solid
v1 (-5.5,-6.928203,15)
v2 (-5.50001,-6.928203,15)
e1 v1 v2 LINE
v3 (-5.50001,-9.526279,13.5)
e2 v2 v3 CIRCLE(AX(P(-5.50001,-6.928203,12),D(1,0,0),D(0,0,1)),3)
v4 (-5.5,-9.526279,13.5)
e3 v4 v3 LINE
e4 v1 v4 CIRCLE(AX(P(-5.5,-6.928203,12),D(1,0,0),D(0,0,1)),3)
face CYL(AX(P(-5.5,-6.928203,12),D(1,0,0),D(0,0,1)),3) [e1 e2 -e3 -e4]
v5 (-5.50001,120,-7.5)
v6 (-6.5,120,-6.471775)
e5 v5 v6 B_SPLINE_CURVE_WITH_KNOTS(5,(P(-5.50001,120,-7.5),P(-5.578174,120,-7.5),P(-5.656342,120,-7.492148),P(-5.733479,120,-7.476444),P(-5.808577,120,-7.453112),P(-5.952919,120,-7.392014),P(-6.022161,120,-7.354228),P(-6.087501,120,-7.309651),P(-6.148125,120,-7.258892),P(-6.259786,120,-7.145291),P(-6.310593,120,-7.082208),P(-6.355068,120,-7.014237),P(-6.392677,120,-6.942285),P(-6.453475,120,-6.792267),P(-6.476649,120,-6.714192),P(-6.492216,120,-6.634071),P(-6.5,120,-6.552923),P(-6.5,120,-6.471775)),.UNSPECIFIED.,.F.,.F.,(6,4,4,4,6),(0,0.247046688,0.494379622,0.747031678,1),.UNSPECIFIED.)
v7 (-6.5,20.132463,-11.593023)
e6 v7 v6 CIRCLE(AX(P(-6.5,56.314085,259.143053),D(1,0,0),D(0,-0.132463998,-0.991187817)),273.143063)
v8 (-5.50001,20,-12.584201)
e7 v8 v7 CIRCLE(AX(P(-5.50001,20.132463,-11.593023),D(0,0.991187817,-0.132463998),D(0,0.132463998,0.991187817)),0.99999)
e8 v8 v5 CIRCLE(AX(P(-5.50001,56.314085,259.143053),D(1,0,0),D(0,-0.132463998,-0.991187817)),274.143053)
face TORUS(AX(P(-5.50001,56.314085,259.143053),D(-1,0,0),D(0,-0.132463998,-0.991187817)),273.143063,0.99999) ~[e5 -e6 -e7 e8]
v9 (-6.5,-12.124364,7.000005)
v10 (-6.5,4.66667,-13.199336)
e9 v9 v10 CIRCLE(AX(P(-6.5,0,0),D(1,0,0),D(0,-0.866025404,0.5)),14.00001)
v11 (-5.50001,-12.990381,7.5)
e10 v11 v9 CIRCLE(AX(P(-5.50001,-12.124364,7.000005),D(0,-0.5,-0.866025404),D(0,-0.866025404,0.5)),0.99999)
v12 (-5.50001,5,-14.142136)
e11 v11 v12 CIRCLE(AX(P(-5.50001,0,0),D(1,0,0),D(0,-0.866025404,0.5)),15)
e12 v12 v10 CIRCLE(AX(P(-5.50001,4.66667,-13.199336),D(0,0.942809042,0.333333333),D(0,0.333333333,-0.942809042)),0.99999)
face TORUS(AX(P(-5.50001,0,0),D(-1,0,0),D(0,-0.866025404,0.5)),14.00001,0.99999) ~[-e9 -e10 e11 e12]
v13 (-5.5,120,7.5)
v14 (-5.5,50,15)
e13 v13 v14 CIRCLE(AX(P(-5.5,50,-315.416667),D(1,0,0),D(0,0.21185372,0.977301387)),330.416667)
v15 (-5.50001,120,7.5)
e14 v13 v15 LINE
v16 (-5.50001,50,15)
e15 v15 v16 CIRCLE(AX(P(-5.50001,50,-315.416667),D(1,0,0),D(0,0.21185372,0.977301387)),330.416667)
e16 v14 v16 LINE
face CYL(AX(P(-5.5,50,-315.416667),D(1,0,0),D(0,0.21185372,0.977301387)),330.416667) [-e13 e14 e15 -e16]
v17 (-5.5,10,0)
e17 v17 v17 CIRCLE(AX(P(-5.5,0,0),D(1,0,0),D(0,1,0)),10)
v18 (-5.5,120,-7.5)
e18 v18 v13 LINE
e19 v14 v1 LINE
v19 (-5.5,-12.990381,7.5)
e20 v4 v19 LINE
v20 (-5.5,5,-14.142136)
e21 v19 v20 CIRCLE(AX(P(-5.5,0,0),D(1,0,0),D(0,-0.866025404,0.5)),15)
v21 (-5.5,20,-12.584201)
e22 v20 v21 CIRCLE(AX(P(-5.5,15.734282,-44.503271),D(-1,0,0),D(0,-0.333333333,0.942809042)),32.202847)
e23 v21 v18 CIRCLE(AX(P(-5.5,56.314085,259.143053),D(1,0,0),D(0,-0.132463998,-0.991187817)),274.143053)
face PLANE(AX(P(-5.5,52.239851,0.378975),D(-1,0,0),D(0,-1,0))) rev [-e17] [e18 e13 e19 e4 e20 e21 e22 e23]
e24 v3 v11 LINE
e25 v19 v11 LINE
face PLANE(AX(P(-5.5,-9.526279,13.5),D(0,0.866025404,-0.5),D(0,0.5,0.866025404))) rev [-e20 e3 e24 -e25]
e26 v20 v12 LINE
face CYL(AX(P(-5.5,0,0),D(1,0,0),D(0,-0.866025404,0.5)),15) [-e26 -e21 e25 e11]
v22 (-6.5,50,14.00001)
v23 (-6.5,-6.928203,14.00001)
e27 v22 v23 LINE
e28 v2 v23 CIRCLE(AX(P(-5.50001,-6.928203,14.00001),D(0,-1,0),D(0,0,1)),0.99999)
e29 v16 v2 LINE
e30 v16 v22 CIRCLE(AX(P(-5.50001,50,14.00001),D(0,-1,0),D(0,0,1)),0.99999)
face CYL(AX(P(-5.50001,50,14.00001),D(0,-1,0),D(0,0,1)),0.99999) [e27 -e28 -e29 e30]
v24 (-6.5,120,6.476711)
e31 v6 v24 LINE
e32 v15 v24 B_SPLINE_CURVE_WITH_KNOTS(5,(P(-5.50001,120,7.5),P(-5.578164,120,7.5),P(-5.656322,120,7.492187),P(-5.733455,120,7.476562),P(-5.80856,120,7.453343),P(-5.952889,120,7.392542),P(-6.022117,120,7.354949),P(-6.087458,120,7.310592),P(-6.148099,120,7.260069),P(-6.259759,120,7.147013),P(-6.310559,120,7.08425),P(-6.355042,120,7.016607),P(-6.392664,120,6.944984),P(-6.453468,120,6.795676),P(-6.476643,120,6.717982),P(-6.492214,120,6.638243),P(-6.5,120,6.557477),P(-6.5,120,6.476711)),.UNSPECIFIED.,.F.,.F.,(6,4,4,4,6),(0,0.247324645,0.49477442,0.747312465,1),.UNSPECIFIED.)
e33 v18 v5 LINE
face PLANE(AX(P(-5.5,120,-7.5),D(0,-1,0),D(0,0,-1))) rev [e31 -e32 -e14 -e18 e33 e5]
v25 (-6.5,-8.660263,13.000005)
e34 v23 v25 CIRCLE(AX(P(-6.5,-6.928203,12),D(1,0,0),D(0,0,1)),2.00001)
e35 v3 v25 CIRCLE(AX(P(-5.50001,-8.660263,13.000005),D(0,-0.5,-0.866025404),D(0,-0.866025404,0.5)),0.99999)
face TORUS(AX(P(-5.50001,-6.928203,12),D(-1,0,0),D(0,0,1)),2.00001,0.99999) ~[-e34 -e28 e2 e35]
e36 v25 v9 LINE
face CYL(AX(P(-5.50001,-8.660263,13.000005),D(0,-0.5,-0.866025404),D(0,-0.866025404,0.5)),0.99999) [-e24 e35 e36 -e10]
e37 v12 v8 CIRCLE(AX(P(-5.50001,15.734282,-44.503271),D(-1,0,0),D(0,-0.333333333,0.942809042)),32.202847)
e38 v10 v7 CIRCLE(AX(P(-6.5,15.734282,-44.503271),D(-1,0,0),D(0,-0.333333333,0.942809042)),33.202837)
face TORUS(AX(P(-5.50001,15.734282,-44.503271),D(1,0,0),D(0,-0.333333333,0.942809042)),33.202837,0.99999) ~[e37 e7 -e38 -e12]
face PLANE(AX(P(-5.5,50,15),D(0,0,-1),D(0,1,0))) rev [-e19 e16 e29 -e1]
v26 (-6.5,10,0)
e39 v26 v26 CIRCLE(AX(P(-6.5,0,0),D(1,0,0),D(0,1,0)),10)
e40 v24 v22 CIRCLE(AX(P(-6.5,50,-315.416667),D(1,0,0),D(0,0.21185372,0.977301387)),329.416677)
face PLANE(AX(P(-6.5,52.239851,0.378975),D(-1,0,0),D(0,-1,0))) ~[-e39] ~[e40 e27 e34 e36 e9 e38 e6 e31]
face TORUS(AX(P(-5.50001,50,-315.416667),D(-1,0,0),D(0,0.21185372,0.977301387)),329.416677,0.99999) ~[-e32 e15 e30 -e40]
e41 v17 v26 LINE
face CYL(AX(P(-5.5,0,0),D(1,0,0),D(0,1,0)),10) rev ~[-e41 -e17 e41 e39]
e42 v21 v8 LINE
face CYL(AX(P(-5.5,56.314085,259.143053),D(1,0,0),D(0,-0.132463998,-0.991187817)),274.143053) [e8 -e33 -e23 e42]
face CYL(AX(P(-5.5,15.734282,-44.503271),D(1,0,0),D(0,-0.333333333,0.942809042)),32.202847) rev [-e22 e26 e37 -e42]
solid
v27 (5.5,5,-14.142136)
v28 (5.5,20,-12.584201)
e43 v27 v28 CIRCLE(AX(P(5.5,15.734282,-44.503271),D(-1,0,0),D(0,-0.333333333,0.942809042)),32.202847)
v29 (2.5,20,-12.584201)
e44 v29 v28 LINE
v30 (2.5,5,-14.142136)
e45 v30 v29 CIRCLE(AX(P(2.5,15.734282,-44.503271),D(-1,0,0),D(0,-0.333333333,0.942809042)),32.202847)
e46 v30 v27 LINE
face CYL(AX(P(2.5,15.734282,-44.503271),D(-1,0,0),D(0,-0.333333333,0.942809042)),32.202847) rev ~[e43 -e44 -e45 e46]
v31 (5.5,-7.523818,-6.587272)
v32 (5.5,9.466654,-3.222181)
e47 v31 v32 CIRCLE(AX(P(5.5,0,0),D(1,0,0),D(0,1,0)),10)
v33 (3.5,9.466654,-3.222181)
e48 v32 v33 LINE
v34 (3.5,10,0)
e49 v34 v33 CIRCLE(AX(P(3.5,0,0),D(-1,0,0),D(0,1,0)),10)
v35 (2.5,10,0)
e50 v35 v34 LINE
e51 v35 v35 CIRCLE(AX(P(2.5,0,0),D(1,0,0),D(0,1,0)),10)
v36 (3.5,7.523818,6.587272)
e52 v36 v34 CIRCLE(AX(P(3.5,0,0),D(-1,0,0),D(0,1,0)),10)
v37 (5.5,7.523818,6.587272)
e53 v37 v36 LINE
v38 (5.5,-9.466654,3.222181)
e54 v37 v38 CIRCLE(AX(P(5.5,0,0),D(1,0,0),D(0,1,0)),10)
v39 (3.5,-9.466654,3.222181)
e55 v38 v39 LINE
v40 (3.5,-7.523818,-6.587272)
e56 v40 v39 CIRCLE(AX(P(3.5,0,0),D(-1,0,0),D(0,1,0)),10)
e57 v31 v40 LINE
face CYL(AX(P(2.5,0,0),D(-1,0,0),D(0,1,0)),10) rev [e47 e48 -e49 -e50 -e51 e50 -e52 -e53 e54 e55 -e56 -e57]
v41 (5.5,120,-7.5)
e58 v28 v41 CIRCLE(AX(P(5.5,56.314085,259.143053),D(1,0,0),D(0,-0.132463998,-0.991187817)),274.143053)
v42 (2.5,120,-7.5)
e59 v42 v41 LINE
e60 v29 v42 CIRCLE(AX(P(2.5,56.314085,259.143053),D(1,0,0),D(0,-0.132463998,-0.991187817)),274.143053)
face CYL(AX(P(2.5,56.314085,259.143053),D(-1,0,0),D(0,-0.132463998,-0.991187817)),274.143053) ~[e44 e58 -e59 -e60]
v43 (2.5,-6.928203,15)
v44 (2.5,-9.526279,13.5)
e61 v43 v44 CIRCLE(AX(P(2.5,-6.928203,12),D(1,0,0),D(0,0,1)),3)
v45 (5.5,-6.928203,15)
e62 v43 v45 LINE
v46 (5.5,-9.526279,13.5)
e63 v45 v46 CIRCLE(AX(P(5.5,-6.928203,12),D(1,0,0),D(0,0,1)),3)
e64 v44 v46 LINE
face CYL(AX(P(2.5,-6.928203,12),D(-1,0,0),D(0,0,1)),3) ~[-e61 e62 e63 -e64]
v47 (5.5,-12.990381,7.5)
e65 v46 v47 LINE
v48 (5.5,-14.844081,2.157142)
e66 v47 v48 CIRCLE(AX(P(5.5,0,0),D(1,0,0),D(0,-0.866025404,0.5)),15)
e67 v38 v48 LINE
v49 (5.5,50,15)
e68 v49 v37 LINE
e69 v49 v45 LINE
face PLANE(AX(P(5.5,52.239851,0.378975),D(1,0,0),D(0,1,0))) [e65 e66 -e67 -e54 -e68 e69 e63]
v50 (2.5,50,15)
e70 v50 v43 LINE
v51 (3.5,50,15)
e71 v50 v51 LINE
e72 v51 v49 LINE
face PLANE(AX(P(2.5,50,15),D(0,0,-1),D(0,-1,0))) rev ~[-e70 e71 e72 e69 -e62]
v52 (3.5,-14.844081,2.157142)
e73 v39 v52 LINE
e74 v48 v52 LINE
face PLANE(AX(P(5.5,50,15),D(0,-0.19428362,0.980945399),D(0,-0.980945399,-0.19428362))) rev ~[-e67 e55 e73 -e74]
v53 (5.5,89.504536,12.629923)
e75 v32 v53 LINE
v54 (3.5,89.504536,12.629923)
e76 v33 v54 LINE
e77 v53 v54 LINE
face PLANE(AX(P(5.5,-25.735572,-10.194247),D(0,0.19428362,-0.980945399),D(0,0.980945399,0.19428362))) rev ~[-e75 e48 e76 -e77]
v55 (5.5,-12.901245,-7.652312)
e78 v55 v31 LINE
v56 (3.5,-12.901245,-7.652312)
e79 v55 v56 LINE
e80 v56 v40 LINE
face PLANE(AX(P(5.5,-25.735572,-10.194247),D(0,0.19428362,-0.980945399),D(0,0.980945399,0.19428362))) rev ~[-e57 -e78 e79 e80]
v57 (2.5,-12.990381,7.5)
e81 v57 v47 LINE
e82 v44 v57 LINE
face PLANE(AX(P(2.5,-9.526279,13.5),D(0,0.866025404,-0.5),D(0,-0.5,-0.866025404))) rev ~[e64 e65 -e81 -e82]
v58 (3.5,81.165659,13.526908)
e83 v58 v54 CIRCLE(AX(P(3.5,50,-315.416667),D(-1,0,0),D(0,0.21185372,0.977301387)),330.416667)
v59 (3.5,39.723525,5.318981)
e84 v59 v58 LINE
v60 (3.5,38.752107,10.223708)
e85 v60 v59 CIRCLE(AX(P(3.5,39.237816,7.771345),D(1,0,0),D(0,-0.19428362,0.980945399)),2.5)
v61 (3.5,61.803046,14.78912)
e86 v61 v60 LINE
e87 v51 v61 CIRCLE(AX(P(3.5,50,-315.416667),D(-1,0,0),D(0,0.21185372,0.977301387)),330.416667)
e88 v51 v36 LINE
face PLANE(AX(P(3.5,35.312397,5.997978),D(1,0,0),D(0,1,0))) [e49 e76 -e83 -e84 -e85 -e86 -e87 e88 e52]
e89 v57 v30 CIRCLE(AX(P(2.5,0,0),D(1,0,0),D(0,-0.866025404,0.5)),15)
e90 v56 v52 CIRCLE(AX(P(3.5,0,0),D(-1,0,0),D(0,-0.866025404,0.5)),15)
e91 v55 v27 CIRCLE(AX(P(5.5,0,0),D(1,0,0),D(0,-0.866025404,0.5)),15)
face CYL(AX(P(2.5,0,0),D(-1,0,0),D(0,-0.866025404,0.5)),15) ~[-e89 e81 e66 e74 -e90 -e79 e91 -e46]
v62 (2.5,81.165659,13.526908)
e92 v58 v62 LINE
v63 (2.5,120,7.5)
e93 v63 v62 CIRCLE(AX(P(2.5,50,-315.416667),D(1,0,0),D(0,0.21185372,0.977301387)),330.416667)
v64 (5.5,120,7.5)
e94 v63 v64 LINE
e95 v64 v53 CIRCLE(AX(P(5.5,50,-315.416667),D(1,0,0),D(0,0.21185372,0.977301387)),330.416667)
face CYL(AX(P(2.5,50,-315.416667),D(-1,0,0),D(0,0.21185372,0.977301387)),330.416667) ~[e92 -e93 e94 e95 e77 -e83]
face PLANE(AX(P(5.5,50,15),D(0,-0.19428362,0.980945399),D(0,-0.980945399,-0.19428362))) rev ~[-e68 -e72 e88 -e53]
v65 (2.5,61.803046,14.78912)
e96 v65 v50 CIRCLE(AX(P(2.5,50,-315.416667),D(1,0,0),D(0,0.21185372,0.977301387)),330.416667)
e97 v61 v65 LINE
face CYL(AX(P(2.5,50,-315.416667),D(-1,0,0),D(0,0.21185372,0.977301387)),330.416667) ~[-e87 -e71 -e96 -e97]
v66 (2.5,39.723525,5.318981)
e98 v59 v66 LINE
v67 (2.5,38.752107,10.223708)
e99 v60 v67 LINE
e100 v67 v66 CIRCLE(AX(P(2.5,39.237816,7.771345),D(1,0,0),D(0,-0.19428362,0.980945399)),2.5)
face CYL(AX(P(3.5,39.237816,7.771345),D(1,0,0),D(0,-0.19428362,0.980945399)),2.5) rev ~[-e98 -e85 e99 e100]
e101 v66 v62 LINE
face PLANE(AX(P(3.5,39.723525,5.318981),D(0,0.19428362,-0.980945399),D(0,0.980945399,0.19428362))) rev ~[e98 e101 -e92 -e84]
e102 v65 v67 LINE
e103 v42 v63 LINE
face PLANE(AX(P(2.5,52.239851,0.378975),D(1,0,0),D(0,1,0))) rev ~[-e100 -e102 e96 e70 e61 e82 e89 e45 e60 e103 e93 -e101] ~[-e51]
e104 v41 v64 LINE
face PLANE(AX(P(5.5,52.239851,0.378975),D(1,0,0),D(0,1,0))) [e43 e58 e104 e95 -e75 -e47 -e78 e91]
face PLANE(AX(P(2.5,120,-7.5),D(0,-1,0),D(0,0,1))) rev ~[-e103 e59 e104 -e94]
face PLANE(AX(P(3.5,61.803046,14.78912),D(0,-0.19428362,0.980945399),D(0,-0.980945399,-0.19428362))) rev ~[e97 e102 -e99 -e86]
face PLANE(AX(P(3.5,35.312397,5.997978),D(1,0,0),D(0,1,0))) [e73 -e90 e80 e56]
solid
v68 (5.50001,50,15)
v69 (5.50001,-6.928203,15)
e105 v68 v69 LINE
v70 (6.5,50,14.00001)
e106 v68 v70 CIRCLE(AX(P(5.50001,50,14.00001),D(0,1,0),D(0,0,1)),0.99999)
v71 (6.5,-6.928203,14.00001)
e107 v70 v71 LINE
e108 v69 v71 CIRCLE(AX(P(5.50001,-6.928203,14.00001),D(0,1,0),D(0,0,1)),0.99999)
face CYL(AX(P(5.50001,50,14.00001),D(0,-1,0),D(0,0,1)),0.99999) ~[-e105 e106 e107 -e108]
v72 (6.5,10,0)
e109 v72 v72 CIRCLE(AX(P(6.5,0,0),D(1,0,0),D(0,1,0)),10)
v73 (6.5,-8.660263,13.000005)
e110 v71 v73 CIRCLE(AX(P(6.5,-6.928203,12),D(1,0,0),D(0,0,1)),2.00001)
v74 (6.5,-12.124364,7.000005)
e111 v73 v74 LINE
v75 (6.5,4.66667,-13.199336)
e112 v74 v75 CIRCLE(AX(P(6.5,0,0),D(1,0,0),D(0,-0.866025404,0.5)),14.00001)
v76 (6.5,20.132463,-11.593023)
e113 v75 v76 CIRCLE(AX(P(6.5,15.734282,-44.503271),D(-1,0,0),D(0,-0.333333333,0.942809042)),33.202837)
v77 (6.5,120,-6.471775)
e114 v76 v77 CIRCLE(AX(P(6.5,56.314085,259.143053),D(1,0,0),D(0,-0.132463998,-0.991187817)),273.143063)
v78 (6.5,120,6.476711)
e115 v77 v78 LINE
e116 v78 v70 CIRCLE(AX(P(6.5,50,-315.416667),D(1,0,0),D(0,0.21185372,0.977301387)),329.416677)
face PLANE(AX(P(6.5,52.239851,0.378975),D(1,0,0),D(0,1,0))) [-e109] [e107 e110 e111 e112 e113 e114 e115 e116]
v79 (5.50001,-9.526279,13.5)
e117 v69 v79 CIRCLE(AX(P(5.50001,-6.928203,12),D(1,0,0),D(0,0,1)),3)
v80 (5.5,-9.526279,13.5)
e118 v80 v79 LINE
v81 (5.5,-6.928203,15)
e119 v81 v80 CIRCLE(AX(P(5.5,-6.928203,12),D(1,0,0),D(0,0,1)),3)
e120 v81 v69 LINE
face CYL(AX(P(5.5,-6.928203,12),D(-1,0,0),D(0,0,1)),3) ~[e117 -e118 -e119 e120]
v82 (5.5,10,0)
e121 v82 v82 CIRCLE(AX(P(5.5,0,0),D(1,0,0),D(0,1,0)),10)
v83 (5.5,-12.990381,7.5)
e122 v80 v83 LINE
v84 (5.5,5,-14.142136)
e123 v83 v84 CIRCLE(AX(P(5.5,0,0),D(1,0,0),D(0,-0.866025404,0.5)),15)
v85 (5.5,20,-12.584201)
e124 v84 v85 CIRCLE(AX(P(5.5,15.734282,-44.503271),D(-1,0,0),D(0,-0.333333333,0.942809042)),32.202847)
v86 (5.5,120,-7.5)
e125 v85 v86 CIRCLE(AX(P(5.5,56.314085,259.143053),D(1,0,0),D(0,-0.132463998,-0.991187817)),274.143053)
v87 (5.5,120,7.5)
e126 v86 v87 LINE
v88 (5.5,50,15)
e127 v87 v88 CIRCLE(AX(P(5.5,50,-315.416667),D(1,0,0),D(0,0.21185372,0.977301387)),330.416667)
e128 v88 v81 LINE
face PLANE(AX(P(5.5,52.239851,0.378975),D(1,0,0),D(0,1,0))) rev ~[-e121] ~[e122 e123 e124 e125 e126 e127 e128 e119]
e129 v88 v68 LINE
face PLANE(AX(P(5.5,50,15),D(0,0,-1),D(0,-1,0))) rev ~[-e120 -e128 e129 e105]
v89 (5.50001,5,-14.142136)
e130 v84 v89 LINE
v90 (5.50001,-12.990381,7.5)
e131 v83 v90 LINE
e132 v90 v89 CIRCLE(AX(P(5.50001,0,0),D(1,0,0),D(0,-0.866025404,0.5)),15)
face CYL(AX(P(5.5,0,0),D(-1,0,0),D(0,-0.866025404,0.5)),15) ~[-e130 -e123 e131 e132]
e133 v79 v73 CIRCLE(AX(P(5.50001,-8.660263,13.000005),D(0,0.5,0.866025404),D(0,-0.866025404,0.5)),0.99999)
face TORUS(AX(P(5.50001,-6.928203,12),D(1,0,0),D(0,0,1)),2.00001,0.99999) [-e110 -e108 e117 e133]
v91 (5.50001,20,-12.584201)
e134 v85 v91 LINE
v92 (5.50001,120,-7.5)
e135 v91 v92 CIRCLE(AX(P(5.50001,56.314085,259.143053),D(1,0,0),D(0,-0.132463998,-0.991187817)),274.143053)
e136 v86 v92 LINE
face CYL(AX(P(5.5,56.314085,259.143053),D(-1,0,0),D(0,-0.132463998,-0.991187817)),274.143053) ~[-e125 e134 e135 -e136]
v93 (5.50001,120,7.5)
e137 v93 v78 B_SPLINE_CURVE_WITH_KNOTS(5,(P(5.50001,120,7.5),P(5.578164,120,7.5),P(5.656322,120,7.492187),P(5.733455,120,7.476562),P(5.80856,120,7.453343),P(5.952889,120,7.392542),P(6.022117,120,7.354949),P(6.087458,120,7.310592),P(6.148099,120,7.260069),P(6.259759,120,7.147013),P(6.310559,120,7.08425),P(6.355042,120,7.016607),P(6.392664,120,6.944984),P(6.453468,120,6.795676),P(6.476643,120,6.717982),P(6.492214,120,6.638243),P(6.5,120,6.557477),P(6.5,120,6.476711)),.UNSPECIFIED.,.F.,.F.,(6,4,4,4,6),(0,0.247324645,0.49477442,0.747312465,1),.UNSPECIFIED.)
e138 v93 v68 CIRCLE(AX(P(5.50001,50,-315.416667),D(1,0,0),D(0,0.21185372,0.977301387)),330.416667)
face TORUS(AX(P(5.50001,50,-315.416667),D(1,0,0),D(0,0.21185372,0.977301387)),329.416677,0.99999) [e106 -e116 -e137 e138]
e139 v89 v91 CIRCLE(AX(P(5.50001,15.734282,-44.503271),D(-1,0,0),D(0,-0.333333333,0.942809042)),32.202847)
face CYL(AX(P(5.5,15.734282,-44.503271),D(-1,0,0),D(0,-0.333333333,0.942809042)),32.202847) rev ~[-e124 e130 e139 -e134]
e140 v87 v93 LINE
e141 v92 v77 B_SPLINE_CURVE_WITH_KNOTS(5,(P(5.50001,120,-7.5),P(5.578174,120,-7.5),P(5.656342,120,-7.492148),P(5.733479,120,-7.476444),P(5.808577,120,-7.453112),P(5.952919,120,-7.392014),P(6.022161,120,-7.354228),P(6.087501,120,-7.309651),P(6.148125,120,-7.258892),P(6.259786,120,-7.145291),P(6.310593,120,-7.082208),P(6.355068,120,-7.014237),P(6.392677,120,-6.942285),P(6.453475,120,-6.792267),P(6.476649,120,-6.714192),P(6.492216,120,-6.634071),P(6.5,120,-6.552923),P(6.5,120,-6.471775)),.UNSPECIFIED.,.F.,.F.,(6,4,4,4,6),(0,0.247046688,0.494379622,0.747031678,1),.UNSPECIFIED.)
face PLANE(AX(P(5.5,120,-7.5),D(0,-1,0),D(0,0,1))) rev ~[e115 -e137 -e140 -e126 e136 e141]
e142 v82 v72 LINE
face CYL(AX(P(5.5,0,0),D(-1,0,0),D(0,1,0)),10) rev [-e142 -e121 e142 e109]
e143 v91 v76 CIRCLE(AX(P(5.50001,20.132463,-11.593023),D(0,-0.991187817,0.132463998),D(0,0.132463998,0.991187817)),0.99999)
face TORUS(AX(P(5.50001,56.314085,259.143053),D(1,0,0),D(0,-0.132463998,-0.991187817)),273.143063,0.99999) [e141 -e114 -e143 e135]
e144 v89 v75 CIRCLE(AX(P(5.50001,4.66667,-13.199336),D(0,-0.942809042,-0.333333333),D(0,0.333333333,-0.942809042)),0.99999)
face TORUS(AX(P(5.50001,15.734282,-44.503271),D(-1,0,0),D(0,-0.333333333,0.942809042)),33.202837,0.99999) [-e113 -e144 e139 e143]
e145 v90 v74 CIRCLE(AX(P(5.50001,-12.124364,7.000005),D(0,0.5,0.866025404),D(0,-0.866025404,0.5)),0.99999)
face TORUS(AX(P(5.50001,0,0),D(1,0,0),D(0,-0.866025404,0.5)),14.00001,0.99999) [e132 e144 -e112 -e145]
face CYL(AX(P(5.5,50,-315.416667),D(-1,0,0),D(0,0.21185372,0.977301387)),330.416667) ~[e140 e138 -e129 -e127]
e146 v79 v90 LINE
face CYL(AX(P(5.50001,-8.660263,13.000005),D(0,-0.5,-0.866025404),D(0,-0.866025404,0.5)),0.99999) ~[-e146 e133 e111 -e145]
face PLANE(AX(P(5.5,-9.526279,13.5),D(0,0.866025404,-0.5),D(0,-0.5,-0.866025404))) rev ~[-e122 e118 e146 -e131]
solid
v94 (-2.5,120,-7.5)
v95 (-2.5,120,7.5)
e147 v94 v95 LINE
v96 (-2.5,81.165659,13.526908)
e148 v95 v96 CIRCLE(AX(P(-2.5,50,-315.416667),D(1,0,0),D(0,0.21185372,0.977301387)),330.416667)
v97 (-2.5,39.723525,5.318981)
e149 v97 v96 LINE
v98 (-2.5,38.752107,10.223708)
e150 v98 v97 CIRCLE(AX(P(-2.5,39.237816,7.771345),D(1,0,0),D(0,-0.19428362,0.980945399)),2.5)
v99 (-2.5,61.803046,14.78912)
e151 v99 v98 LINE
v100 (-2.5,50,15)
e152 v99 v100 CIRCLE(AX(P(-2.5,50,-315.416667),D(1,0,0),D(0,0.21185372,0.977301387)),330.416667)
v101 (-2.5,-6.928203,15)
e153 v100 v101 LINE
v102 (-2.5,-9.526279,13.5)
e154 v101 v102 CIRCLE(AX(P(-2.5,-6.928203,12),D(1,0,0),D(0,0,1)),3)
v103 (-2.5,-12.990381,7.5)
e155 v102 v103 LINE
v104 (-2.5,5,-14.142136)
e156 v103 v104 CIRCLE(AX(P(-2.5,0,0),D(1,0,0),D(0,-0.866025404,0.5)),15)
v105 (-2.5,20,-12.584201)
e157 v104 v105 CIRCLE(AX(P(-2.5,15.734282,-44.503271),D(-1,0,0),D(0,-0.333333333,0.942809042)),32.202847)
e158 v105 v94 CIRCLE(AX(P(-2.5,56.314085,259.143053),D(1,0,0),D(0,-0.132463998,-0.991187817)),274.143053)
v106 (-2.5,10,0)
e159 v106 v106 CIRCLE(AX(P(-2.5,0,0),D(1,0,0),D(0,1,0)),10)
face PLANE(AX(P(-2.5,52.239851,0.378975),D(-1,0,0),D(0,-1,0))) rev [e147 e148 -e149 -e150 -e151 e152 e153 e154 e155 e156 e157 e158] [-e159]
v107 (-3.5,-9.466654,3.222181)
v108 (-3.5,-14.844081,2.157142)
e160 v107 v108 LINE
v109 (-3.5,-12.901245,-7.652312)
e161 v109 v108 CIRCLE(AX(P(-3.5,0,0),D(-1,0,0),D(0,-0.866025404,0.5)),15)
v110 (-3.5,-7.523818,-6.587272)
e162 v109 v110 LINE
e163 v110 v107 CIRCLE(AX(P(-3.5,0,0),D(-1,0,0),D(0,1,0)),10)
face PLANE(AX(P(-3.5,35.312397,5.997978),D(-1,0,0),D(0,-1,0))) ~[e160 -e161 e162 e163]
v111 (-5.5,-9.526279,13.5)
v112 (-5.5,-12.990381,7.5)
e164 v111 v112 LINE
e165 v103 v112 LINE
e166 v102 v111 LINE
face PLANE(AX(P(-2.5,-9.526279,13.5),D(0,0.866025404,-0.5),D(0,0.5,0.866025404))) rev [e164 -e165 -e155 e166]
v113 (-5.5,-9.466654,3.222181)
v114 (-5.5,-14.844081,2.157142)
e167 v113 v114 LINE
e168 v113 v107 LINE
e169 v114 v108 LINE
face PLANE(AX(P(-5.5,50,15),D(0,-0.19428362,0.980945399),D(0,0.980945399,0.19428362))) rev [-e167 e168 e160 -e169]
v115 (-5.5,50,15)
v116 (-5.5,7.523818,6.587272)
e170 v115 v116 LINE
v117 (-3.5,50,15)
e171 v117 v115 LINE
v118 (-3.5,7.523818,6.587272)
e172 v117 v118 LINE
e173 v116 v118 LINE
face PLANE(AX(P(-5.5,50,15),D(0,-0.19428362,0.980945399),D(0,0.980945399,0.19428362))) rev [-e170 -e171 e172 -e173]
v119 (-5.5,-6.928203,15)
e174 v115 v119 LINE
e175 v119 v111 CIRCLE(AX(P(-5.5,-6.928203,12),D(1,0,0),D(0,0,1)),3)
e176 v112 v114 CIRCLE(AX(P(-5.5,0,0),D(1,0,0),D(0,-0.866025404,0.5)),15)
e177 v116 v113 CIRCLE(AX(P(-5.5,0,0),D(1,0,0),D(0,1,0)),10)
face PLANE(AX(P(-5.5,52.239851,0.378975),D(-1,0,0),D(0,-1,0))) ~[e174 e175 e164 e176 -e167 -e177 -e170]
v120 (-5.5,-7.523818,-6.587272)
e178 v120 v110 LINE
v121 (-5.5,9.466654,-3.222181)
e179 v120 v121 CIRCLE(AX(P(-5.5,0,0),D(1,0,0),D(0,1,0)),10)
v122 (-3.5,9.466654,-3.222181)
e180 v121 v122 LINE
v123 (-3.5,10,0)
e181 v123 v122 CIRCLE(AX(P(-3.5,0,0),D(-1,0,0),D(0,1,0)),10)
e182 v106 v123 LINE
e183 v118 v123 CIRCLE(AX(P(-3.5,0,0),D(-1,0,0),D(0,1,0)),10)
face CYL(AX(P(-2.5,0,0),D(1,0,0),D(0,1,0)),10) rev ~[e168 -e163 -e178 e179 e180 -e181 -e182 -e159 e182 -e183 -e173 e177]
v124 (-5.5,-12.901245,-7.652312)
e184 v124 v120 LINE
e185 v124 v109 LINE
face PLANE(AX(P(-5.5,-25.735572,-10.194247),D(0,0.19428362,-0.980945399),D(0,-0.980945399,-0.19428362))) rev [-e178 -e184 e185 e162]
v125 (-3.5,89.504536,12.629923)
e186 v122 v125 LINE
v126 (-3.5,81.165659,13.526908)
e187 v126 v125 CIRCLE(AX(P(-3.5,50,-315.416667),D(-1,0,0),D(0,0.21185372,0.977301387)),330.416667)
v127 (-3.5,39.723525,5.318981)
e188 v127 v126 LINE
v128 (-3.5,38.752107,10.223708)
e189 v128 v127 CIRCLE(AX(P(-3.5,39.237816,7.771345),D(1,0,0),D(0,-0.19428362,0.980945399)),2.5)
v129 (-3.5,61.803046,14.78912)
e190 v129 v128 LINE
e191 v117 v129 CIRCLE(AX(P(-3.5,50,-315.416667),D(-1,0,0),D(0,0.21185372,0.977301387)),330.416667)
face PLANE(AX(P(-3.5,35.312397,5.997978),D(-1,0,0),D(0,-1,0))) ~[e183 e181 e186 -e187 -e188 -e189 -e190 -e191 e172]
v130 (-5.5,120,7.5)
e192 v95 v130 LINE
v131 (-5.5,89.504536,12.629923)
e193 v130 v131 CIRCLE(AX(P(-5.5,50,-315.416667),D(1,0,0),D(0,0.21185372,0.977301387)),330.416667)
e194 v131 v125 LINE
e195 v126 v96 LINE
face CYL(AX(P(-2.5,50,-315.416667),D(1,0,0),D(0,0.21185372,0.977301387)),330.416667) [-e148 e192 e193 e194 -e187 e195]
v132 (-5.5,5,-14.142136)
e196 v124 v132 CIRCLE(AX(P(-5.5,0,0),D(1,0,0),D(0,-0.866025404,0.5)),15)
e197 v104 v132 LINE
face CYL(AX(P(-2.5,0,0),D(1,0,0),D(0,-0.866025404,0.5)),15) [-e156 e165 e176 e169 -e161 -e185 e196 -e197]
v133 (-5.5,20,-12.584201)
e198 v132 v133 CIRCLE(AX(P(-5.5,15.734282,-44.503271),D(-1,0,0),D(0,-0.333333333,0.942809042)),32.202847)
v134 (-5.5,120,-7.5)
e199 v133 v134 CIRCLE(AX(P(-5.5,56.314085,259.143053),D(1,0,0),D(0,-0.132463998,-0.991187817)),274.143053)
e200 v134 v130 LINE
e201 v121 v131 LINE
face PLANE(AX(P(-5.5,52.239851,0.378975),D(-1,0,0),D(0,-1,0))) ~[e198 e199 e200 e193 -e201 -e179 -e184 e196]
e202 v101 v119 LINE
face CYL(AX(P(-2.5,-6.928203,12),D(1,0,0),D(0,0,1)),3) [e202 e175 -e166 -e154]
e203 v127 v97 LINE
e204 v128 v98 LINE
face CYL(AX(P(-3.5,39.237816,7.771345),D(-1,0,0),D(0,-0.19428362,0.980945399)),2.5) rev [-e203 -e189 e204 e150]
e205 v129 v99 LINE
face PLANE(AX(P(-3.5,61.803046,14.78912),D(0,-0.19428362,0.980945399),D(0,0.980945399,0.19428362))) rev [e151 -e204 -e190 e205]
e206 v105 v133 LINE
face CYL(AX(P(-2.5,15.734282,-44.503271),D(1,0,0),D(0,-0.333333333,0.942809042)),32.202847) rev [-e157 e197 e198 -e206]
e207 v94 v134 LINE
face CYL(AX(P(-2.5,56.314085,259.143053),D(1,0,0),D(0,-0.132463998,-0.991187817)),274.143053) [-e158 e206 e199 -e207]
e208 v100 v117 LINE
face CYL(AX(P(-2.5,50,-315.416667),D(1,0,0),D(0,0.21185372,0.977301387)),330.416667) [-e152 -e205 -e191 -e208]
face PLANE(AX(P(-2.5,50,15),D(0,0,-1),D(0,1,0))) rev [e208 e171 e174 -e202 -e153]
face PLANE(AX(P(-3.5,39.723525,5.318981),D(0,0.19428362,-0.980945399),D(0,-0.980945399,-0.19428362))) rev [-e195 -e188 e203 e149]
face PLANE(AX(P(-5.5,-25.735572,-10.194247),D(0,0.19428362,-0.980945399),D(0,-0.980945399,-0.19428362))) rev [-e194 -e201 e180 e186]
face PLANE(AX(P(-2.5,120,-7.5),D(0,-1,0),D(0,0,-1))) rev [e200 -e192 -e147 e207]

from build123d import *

# Parameters (mm, degrees)
F1_R     = 10
F2_DEPTH = 3
F4_DEPTH = 2
F6_DEPTH = 1.001
F7_START = 3
F7_DEPTH = 1
F8_R     = 0.99999


# Not quite as in the source:
# - a fillet or chamfer is up to 0.001 mm smaller than in the source, because OpenCascade refuses the exact size


with BuildPart() as f2:
    # F1 (on offset) → F2 (new body)
    with BuildSketch(Plane.YZ.offset(2.5)):
        with BuildLine():
            Line((-9.5262794416, 13.5), (-12.9903810568, 7.5))
            ThreePointArc((-12.9903810568, 7.5), (-11.5350360185, -9.5886883385), (5, -14.1421356237))
            ThreePointArc((5, -14.1421356237), (12.4075163283, -12.4727233008), (20, -12.5842013328))
            ThreePointArc((20, -12.5842013328), (70.2340902125, -14.6463678304), (120, -7.5))
            Line((120, -7.5), (120, 7.5))
            ThreePointArc((120, 7.5), (85.2003196008, 13.1196496077), (50, 15))
            Line((50, 15), (-6.9282032303, 15))
            ThreePointArc((-6.9282032303, 15), (-8.4282032303, 14.5980762114), (-9.5262794416, 13.5))
        make_face()
        Circle(F1_R, mode=Mode.SUBTRACT)
    extrude(amount=F2_DEPTH)

    # F3 (on face) → F4 (cut)
    with BuildSketch(Plane.YZ.offset(5.5)):
        Polygon((50, 15), (-25.7355715851, 0), (-25.7355715851, -10.1942473186), (101.4711431703, 15), align=None)
    extrude(amount=-F4_DEPTH, mode=Mode.SUBTRACT)

    # F5 (on face) → F6 (cut, through all)
    with BuildSketch(Plane.YZ.offset(3.5)):
        with BuildLine():
            Line((61.8030459338, 14.7891202569), (38.7521068975, 10.2237082806))
            ThreePointArc((38.7521068975, 10.2237082806), (36.7854524498, 7.2856357349), (39.7235249955, 5.3189812873))
            Line((39.7235249955, 5.3189812873), (87.538617519, 14.7891202569))
            Line((87.538617519, 14.7891202569), (61.8030459338, 14.7891202569))
        make_face()
    extrude(amount=-F6_DEPTH, mode=Mode.SUBTRACT)


with BuildPart() as f7:
    # F1 (on offset) → F7 (new body)
    with BuildSketch(Plane.YZ.offset(2.5).offset(F7_START)):
        with BuildLine():
            Line((-9.5262794416, 13.5), (-12.9903810568, 7.5))
            ThreePointArc((-12.9903810568, 7.5), (-11.5350360185, -9.5886883385), (5, -14.1421356237))
            ThreePointArc((5, -14.1421356237), (12.4075163283, -12.4727233008), (20, -12.5842013328))
            ThreePointArc((20, -12.5842013328), (70.2340902125, -14.6463678304), (120, -7.5))
            Line((120, -7.5), (120, 7.5))
            ThreePointArc((120, 7.5), (85.2003196008, 13.1196496077), (50, 15))
            Line((50, 15), (-6.9282032303, 15))
            ThreePointArc((-6.9282032303, 15), (-8.4282032303, 14.5980762114), (-9.5262794416, 13.5))
        make_face()
        Circle(F1_R, mode=Mode.SUBTRACT)
    extrude(amount=F7_DEPTH)

    # F8 (radius 1 in the source; OpenCascade refuses exactly that, so slightly less here)
    f8_edges = [f7.edges().sort_by_distance(p)[0] for p in [
        (6.5, -11.25833, 10.5),
    ]]
    fillet(f8_edges, radius=F8_R)


with BuildPart() as f9_1:
    # F9: instance of F2
    add(f2.part.mirror(Plane.YZ))


with BuildPart() as f9_2:
    # F9: instance of F7
    add(f7.part.mirror(Plane.YZ))


solid = Compound([f2.part, f7.part, f9_1.part, f9_2.part])
